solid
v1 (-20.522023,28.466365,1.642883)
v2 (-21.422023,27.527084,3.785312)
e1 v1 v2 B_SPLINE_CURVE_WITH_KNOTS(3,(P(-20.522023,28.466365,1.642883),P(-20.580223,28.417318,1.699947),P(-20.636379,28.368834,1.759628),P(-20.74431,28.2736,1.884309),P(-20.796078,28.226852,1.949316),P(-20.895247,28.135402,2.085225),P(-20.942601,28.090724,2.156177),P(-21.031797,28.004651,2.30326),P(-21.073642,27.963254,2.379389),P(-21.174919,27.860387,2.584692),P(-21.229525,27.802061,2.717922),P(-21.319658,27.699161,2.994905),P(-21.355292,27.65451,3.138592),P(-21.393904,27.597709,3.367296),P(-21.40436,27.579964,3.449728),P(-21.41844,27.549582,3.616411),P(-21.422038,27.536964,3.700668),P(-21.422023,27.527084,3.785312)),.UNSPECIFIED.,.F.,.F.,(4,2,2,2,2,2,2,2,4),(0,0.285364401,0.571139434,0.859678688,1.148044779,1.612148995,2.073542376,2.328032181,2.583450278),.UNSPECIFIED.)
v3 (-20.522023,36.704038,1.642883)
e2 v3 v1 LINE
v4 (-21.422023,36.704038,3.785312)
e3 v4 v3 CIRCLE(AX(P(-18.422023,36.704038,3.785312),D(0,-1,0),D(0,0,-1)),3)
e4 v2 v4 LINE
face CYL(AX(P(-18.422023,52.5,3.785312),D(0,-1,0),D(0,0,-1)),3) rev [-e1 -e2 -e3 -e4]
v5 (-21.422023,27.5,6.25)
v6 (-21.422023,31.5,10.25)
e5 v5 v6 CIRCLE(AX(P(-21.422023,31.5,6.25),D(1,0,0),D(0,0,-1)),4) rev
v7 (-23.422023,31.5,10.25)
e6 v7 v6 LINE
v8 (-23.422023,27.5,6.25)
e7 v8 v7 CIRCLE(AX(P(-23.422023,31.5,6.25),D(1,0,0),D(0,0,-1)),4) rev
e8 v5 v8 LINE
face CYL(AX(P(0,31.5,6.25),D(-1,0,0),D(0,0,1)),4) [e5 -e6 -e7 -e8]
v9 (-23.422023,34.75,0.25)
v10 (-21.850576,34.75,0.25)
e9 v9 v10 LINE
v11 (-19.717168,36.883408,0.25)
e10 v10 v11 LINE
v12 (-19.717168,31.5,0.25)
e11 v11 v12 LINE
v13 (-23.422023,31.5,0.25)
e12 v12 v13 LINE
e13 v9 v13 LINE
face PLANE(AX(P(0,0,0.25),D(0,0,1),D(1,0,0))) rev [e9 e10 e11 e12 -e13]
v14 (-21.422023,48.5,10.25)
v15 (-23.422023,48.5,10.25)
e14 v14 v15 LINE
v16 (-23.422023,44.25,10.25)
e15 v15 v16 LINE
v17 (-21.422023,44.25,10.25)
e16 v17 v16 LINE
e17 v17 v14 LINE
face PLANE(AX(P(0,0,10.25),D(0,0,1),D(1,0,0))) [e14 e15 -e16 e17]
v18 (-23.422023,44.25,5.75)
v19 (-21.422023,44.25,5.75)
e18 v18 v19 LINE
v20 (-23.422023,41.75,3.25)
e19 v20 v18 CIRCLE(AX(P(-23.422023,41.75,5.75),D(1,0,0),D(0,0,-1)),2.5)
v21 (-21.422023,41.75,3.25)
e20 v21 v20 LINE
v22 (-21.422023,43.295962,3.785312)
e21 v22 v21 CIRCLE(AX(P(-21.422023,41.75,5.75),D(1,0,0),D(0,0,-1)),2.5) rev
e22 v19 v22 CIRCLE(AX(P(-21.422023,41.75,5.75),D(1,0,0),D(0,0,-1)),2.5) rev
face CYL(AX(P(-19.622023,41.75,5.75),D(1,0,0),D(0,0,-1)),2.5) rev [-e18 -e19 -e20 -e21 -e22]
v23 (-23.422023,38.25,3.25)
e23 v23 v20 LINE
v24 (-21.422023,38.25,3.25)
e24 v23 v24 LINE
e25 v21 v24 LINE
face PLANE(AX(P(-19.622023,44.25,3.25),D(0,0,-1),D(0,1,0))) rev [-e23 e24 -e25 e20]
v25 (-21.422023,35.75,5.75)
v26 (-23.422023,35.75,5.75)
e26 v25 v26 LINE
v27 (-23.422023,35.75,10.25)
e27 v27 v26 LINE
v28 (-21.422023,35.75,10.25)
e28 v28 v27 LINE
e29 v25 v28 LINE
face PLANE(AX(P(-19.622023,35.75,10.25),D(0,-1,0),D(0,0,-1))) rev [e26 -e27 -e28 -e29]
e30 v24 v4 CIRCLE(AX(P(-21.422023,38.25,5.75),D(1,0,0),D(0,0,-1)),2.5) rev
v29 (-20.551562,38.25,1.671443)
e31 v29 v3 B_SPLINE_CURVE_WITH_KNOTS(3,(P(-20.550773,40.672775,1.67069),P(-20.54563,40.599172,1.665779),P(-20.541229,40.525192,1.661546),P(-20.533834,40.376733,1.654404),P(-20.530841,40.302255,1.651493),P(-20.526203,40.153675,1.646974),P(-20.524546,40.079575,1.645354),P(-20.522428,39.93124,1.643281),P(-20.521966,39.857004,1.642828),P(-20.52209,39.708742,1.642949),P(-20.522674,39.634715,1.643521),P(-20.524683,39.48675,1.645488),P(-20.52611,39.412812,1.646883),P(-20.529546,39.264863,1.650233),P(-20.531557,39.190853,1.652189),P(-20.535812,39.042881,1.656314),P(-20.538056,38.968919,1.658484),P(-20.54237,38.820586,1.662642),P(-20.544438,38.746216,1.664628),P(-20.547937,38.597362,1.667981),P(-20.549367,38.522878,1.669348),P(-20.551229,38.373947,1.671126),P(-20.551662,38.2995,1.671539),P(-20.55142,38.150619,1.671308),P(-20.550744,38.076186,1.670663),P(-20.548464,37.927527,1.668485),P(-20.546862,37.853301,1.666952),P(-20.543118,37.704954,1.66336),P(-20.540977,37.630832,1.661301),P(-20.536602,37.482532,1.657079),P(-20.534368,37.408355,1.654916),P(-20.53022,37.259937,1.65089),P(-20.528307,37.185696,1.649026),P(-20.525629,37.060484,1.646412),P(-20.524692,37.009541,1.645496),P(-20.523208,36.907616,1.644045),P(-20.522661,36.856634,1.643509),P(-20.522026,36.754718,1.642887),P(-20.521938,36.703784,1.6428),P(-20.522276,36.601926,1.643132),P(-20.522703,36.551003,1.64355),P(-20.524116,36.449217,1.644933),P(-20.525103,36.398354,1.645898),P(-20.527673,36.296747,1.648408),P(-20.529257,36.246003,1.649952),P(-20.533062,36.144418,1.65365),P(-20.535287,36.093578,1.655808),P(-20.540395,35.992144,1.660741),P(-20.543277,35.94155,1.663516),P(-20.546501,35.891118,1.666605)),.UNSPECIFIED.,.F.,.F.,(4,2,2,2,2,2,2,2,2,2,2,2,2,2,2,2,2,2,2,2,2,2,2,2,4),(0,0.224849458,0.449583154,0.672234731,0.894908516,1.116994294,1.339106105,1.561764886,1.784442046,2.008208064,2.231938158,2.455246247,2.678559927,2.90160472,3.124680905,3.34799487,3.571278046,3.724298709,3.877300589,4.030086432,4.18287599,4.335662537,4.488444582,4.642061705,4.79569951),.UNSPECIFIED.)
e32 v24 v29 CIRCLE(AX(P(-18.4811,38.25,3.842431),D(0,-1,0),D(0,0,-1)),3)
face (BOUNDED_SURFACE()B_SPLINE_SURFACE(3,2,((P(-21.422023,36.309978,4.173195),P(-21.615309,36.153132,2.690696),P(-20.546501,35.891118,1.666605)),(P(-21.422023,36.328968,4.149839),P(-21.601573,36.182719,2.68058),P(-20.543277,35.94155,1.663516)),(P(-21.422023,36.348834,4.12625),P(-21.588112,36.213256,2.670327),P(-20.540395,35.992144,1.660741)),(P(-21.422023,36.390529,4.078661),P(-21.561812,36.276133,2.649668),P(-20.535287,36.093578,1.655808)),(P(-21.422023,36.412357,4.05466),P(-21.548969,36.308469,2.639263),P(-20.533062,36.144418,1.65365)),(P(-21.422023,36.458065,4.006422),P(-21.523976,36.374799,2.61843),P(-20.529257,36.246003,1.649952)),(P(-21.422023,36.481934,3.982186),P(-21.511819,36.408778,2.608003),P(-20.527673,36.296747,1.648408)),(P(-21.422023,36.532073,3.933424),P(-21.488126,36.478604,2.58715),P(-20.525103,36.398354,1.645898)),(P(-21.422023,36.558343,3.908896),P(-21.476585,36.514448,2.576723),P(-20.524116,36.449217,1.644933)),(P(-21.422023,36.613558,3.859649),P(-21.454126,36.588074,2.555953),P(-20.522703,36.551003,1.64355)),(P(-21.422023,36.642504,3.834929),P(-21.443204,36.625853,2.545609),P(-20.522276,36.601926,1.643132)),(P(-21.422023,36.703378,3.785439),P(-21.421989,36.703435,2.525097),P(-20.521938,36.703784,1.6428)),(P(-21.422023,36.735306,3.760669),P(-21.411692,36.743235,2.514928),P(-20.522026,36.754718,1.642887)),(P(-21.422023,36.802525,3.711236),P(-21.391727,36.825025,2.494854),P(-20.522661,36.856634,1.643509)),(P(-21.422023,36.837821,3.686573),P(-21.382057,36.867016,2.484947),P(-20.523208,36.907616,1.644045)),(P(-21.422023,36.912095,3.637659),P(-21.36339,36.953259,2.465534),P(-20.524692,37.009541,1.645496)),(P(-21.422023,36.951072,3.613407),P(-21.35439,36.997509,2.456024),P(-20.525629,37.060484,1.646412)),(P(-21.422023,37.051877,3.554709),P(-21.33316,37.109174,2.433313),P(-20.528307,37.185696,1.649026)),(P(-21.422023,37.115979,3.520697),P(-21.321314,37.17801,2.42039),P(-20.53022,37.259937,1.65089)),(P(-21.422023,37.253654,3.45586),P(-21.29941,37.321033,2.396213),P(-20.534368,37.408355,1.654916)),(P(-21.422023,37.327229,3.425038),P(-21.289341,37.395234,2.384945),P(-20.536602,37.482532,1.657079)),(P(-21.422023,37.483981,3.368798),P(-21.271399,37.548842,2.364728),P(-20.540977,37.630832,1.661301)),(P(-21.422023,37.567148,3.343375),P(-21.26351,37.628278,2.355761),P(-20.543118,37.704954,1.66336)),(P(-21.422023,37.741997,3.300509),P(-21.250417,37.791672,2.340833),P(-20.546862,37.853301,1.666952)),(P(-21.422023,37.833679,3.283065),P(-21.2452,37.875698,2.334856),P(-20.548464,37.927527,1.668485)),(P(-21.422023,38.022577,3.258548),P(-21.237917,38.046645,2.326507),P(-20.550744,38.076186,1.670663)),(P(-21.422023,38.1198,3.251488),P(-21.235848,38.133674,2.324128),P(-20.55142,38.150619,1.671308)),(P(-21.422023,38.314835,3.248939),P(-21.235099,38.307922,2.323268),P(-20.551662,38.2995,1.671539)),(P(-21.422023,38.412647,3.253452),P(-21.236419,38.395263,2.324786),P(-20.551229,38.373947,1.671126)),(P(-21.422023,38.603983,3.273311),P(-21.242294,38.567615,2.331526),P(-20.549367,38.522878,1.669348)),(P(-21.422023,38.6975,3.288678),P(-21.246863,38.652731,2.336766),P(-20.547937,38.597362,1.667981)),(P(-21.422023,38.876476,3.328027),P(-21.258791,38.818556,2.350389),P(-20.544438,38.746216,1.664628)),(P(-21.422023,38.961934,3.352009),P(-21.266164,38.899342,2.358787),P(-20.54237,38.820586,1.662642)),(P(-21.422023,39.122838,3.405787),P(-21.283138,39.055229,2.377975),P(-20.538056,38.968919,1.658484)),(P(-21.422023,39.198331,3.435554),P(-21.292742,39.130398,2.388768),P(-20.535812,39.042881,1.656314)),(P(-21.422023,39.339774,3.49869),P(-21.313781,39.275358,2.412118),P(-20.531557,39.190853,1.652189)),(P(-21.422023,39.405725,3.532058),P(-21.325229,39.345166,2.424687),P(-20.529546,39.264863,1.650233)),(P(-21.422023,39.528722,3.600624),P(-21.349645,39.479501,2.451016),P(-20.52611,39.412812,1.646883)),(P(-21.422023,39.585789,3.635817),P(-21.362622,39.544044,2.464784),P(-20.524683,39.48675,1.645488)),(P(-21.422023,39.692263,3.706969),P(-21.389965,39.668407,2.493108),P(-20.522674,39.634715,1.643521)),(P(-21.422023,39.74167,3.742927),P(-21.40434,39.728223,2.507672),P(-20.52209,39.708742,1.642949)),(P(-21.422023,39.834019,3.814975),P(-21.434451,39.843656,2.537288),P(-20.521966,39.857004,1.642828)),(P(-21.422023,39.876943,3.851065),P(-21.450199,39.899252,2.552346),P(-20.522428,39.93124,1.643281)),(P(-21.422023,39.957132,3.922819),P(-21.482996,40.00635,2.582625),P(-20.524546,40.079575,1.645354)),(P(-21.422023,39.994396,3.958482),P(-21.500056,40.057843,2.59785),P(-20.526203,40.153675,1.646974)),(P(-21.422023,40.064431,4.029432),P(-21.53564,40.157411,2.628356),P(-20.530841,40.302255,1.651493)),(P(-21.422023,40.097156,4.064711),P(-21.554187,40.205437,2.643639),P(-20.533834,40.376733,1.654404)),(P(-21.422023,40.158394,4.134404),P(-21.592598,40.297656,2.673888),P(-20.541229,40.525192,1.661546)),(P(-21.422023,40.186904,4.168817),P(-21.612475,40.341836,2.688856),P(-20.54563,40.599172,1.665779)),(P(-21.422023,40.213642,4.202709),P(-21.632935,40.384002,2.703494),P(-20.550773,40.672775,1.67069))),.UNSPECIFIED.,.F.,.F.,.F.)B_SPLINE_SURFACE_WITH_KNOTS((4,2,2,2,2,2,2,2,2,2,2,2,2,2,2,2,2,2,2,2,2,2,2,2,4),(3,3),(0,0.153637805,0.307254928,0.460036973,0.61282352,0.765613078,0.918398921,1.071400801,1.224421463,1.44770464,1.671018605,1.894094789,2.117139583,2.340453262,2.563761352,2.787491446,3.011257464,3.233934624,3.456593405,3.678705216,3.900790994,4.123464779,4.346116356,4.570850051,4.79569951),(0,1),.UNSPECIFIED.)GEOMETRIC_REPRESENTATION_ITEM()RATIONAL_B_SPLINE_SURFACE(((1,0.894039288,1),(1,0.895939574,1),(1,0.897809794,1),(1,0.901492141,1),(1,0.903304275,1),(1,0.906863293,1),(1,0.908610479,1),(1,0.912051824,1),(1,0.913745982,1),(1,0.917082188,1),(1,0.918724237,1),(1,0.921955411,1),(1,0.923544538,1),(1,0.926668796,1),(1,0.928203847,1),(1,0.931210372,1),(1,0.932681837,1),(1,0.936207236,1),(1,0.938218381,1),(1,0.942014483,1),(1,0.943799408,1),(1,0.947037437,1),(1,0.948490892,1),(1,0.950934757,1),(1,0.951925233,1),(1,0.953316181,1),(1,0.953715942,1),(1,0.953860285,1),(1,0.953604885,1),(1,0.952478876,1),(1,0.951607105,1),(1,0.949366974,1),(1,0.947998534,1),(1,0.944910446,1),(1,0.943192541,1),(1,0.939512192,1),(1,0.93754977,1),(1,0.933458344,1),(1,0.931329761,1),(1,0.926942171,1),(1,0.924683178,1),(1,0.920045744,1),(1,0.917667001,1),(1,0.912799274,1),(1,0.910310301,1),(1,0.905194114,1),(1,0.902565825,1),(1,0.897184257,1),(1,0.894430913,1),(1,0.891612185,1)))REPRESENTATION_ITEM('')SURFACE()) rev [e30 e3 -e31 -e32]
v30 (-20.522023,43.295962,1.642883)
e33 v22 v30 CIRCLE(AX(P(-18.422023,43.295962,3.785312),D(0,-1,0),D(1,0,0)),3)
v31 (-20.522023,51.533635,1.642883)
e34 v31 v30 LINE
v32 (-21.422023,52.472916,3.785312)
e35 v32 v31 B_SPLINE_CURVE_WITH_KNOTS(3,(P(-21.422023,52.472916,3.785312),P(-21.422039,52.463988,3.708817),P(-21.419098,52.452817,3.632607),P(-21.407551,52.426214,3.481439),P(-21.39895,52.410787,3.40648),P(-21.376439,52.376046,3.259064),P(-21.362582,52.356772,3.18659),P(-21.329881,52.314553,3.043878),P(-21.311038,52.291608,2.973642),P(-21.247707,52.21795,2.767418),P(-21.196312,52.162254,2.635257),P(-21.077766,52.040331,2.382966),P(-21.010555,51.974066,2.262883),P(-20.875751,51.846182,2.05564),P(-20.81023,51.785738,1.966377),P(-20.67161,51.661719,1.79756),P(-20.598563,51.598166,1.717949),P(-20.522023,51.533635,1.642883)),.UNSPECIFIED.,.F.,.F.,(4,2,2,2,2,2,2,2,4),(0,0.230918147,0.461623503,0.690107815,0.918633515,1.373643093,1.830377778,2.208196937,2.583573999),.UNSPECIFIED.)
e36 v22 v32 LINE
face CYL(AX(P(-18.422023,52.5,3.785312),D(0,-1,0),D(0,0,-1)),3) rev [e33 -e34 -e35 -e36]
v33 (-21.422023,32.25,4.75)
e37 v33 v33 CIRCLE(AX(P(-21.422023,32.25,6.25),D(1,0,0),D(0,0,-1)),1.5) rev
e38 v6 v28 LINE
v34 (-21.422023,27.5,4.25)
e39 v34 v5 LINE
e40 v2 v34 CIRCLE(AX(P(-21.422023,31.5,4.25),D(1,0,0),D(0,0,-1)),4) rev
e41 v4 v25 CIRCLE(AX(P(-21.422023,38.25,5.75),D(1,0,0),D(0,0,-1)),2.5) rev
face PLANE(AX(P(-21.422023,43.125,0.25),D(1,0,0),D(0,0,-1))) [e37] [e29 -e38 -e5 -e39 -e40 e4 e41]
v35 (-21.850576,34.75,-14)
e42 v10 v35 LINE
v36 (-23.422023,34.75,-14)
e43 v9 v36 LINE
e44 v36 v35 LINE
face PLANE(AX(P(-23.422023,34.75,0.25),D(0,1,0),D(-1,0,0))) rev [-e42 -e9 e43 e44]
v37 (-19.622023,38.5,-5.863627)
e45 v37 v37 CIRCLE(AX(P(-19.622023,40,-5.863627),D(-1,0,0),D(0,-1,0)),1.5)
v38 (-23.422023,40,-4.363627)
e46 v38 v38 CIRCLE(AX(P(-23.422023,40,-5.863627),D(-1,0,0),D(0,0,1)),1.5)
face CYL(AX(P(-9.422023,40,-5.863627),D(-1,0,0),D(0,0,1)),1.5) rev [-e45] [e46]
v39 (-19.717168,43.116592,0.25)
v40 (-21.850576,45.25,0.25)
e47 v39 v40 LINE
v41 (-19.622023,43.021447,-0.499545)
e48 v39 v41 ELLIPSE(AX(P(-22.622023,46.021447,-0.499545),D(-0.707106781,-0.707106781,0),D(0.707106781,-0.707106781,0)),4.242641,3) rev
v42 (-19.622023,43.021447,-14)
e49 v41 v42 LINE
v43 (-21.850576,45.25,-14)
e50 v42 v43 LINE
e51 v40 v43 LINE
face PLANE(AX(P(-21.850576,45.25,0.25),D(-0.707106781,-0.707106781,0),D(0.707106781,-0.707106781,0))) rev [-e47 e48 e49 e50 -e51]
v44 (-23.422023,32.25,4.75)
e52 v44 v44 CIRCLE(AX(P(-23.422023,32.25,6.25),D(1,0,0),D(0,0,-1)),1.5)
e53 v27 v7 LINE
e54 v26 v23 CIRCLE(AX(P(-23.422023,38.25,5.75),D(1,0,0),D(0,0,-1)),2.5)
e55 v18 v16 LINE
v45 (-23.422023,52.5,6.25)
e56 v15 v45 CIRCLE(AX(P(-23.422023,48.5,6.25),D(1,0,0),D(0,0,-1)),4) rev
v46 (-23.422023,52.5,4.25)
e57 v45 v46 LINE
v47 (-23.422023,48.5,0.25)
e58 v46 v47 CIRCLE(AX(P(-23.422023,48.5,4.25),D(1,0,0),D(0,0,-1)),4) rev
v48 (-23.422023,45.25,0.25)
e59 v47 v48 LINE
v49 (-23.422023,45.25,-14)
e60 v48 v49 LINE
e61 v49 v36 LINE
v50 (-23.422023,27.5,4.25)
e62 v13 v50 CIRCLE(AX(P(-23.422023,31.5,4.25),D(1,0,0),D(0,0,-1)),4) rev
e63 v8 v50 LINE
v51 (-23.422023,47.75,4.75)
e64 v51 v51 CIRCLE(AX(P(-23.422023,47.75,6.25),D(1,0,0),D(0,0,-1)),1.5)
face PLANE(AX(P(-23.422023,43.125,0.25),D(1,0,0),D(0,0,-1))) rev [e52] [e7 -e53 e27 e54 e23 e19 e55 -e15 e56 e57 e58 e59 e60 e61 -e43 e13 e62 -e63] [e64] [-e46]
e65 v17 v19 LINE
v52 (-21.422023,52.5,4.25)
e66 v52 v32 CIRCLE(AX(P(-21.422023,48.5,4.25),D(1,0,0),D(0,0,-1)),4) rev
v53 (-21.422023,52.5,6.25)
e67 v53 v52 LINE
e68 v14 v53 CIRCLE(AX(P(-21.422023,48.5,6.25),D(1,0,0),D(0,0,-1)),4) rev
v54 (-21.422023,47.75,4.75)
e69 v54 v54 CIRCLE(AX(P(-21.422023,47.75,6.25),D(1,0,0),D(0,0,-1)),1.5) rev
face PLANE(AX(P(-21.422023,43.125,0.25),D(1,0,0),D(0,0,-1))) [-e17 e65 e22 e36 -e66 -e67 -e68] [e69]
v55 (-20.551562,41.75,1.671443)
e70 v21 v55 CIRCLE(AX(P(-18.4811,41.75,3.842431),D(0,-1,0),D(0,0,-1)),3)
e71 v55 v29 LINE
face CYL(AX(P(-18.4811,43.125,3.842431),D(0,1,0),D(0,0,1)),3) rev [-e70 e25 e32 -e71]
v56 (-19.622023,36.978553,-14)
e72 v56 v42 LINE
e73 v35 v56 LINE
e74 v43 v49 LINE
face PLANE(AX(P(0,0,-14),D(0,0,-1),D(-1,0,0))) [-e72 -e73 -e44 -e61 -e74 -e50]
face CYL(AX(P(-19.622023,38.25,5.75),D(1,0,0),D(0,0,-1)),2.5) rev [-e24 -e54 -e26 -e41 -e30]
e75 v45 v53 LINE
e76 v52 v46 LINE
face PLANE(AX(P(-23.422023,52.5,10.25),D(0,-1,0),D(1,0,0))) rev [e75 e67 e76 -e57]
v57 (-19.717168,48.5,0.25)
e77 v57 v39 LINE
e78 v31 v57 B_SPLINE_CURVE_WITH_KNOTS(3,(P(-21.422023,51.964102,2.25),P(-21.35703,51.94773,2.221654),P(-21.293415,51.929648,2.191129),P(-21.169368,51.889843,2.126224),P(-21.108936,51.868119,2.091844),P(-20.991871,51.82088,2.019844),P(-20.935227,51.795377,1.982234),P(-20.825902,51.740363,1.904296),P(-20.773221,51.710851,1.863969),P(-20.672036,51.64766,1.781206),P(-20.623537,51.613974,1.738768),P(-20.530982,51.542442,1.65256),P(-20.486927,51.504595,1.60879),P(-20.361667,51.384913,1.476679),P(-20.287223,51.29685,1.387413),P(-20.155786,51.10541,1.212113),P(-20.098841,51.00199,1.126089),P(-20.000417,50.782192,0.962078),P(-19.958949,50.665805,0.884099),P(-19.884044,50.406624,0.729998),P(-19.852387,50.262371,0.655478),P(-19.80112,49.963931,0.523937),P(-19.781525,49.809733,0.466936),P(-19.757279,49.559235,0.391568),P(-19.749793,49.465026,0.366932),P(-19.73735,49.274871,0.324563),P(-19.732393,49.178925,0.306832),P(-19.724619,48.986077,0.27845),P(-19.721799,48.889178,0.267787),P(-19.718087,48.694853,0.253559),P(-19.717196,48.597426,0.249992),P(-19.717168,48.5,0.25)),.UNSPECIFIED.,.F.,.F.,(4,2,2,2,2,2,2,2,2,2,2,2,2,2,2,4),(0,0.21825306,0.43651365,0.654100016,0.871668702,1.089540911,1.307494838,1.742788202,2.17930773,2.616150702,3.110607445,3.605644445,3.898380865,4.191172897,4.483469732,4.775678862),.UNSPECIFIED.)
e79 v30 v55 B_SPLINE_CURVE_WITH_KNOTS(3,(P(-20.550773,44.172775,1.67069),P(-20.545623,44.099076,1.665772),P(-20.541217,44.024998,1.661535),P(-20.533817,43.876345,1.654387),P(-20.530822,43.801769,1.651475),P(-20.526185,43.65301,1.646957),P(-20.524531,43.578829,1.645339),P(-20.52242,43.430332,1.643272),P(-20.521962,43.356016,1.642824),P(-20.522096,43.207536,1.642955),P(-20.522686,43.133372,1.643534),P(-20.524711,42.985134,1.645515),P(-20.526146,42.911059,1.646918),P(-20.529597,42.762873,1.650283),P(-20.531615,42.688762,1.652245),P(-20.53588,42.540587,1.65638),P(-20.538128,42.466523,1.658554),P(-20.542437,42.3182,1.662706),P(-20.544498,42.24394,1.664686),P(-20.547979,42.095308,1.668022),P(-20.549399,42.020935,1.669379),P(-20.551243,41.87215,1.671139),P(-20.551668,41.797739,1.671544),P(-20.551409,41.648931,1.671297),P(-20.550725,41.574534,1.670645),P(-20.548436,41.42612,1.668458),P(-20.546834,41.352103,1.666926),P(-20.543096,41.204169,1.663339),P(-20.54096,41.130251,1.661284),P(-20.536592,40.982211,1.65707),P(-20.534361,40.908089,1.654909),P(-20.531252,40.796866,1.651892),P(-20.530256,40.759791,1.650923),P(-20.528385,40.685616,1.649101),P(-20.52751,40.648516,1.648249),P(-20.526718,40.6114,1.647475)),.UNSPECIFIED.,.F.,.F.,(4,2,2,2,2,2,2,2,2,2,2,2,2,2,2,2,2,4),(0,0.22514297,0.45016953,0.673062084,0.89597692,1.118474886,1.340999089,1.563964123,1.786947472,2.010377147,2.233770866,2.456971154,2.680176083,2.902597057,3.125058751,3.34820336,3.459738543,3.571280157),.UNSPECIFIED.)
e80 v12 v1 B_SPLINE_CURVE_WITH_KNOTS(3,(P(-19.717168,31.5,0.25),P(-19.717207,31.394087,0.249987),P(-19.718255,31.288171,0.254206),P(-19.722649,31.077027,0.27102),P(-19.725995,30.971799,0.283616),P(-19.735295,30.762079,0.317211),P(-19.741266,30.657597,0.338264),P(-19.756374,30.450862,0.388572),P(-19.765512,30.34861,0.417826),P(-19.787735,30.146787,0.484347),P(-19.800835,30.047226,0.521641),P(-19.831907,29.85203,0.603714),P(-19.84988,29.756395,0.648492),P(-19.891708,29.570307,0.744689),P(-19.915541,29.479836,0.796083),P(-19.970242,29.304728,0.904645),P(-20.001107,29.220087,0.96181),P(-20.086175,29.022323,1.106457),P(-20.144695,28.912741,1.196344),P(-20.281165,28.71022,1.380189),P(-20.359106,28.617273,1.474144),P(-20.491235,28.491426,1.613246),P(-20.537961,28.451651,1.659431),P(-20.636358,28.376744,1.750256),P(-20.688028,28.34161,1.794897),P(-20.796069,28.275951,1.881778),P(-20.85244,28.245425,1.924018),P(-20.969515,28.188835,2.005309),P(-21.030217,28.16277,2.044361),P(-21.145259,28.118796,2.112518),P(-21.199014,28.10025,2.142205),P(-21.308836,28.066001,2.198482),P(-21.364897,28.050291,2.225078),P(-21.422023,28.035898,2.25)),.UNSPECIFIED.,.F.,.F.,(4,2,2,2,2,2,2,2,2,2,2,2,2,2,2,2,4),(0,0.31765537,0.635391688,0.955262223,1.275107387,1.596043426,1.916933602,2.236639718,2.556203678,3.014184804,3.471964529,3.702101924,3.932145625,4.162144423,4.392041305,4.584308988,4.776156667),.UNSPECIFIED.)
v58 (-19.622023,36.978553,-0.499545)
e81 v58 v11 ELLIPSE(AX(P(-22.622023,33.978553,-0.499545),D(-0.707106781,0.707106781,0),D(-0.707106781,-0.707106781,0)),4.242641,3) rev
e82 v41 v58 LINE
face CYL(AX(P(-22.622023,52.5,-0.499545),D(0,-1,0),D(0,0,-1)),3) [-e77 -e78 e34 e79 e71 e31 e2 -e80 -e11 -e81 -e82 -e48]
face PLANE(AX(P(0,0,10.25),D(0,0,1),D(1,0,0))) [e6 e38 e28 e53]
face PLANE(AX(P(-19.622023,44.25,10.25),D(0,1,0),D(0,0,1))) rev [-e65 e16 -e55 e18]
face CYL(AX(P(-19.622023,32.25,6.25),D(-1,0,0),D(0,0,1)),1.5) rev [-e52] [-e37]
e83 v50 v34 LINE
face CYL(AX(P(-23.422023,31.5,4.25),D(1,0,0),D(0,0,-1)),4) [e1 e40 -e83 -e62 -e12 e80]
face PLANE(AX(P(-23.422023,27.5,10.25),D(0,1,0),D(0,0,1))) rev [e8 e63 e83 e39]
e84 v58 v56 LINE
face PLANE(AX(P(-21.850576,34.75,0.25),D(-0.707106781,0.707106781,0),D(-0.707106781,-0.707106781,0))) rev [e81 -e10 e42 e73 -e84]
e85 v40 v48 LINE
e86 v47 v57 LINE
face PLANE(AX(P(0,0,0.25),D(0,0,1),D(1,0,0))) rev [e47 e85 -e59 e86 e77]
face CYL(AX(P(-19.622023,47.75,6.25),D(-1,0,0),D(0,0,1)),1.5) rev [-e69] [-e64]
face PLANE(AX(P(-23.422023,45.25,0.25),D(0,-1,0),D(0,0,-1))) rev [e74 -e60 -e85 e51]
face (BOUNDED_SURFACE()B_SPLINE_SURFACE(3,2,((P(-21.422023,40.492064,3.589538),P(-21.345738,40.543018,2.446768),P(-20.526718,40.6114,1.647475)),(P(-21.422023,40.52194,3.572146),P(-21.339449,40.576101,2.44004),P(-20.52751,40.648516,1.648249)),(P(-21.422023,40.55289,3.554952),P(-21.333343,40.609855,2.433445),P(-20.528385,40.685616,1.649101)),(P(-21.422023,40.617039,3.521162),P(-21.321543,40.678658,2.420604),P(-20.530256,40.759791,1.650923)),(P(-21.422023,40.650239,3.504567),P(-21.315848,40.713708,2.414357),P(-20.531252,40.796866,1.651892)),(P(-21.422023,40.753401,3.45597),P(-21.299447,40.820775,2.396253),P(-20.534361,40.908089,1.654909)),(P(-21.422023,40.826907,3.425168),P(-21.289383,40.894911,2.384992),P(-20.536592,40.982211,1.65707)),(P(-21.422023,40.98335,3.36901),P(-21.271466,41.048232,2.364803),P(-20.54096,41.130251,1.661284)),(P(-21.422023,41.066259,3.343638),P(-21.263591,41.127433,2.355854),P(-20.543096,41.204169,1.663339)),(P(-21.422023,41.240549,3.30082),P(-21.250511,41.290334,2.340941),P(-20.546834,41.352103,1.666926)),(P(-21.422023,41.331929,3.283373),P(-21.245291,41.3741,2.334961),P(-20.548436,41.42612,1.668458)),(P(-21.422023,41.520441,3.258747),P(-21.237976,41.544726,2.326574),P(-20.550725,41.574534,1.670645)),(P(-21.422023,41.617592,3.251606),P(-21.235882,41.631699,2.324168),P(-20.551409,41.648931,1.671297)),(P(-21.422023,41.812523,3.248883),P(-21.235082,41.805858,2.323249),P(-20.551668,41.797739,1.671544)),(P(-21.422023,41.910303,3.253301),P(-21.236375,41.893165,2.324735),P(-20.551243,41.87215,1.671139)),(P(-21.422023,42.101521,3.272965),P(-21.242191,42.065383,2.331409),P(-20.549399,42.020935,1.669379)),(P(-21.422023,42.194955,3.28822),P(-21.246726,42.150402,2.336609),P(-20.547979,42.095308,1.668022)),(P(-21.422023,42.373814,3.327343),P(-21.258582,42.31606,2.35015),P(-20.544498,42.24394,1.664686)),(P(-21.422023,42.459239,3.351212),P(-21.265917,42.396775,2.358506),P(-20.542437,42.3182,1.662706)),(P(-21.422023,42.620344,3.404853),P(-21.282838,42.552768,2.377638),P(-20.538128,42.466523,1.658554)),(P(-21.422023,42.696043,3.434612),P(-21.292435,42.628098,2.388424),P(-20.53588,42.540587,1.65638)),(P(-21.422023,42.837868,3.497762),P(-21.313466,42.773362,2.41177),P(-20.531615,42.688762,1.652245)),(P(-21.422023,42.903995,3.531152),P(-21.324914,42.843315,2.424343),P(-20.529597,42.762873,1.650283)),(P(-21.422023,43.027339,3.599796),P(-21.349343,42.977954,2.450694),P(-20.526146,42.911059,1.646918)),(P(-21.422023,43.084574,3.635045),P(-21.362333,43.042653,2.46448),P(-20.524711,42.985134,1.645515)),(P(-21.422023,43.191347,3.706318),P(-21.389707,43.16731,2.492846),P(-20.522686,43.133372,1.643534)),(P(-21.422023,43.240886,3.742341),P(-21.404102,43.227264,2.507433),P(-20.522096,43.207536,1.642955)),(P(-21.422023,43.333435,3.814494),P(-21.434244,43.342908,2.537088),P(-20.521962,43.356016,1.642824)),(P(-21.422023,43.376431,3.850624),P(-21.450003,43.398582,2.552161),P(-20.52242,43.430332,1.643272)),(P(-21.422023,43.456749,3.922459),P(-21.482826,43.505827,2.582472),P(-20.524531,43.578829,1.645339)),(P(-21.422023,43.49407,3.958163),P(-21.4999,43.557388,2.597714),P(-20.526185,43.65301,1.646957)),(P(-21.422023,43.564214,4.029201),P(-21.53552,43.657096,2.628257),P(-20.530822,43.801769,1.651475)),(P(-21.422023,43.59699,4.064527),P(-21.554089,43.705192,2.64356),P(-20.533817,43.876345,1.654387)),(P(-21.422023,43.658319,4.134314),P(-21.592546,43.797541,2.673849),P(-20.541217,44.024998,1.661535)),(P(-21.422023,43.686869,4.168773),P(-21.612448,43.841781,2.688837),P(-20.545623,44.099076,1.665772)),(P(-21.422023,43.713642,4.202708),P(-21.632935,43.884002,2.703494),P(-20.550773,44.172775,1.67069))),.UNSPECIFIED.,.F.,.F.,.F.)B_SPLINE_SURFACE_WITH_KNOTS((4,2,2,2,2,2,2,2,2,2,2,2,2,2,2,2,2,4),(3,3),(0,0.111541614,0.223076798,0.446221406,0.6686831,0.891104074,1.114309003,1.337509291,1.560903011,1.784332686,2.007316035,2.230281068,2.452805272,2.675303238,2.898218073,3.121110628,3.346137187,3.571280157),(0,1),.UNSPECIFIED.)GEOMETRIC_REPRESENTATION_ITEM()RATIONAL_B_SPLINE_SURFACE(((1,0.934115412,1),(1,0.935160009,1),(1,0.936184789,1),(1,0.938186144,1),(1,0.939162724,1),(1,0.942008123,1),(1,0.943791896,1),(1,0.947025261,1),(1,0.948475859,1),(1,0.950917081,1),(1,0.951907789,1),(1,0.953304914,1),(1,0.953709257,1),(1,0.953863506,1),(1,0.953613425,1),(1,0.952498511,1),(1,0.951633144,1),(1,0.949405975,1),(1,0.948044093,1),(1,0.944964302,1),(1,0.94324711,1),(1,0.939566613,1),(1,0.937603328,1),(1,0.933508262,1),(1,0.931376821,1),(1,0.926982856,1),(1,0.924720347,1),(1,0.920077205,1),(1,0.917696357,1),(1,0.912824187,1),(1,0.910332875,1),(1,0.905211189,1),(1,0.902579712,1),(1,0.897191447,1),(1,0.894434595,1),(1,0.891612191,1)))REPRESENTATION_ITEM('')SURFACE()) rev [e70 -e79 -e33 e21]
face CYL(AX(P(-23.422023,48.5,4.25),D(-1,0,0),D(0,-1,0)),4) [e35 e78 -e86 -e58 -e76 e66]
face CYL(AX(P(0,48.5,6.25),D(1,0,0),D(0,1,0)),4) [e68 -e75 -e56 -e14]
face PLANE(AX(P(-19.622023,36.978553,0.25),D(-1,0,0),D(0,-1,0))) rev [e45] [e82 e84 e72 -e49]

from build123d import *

# Parameters (mm, degrees)
BOSS_EXTRUDE1_DEPTH      = 0.25
BOSS_EXTRUDE1_DEPTH_BACK = 14
SKETCH2_R                = 1.5
CUT_EXTRUDE1_DEPTH       = 14
SKETCH3_W                = 3.8
SKETCH3_H                = 25
BOSS_EXTRUDE2_DEPTH      = 10
CUT_EXTRUDE2_DEPTH       = 55.467329657
CUT_EXTRUDE2_DEPTH_BACK  = 55.467329657
SKETCH4_R                = 1.5
SKETCH4_W                = 7
SKETCH4_H                = 8.5
FILLET1_R                = 4
FILLET2_R                = 2.5
SKETCH5_W                = 8
SKETCH5_H                = 25
CUT_EXTRUDE3_DEPTH       = 1.8
FILLET3_R                = 3
FILLET4_R                = 3


with BuildPart() as part:
    # Sketch1 → Boss-Extrude1 (new, two sides: drawn at the far end of the back side and taken through both)
    with BuildSketch(Plane.XY.offset(-BOSS_EXTRUDE1_DEPTH_BACK)):
        Polygon((-23.42202285, 43.125), (-23.42202285, 45.25), (-21.850576241, 45.25), (-19.62202285, 43.021446609), (-19.62202285, 36.978553391), (-21.850576241, 34.75), (-23.42202285, 34.75), align=None)
    extrude(amount=BOSS_EXTRUDE1_DEPTH + BOSS_EXTRUDE1_DEPTH_BACK)

    # Sketch2 → Cut-Extrude1 (cut)
    with BuildSketch(Plane.ZY.offset(23.42202285)):
        with Locations((-5.863626805, 40)):
            Circle(SKETCH2_R)
    extrude(amount=-CUT_EXTRUDE1_DEPTH, mode=Mode.SUBTRACT)

    # Sketch3 → Boss-Extrude2 (add)
    with BuildSketch(Plane.XY.offset(0.25)):
        with Locations((-21.52202285, 40)):
            Rectangle(SKETCH3_W, SKETCH3_H)
    extrude(amount=BOSS_EXTRUDE2_DEPTH)

    # Sketch4 → Cut-Extrude2 (cut, two sides: drawn at the far end of the back side and taken through both)
    with BuildSketch(Plane.ZY.offset(23.42202285).offset(-CUT_EXTRUDE2_DEPTH_BACK)):
        with Locations((6.25, 47.75)):
            Circle(SKETCH4_R)
        with Locations((6.25, 32.25)):
            Circle(SKETCH4_R)
        with Locations((6.75, 40)):
            Rectangle(SKETCH4_W, SKETCH4_H)
    extrude(amount=CUT_EXTRUDE2_DEPTH + CUT_EXTRUDE2_DEPTH_BACK, mode=Mode.SUBTRACT)

    # Fillet1
    fillet1_edges = [part.edges().sort_by_distance(p)[0] for p in [
        (-21.52202285, 27.5, 0.25),
        (-21.52202285, 52.5, 0.25),
        (-21.52202285, 27.5, 10.25),
        (-21.52202285, 52.5, 10.25),
    ]]
    fillet(fillet1_edges, radius=FILLET1_R)

    # Fillet2
    fillet2_edges = [part.edges().sort_by_distance(p)[0] for p in [
        (-21.52202285, 35.75, 3.25),
        (-21.52202285, 44.25, 3.25),
    ]]
    fillet(fillet2_edges, radius=FILLET2_R)

    # Sketch5 → Cut-Extrude3 (cut)
    with BuildSketch(Plane(origin=(-19.62202285, 0, 0), x_dir=(0, 0, -1), z_dir=(1, 0, 0))):
        with Locations((-6.25, 40)):
            Rectangle(SKETCH5_W, SKETCH5_H)
    extrude(amount=-CUT_EXTRUDE3_DEPTH, mode=Mode.SUBTRACT)

    # Fillet3
    # the kernel refuses this fillet: 3 mm, written as the material it takes off along each edge
    with BuildSketch(Plane(origin=(-19.62202285, 58.837965158, 2.25), x_dir=(-1, 0, 0), z_dir=(0, -1, 0))) as fillet3_piece_1:
        with BuildLine():
            CenterArc((3, 2.749545417), FILLET3_R, 180, 66.421821522)
            Line((0, 2.749545417), (-0.06, 2.749545417))
            Line((-0.06, 2.749545417), (-0.06, 0))
            Line((-0.06, 0), (0, -0.06))
            ThreePointArc((0, -0.06), (0.9, -0.06), (1.776, -0.054990908))
            Line((1.776, -0.054990908), (1.8, 0))
        make_face()
    extrude(amount=37.675930315, mode=Mode.SUBTRACT)

    # Fillet4
    fillet4_edges = [part.edges().sort_by_distance(p)[0] for p in [
        (-21.42202285, 40, 2.25),
    ]]
    fillet(fillet4_edges, radius=FILLET4_R)


solid = part.part
